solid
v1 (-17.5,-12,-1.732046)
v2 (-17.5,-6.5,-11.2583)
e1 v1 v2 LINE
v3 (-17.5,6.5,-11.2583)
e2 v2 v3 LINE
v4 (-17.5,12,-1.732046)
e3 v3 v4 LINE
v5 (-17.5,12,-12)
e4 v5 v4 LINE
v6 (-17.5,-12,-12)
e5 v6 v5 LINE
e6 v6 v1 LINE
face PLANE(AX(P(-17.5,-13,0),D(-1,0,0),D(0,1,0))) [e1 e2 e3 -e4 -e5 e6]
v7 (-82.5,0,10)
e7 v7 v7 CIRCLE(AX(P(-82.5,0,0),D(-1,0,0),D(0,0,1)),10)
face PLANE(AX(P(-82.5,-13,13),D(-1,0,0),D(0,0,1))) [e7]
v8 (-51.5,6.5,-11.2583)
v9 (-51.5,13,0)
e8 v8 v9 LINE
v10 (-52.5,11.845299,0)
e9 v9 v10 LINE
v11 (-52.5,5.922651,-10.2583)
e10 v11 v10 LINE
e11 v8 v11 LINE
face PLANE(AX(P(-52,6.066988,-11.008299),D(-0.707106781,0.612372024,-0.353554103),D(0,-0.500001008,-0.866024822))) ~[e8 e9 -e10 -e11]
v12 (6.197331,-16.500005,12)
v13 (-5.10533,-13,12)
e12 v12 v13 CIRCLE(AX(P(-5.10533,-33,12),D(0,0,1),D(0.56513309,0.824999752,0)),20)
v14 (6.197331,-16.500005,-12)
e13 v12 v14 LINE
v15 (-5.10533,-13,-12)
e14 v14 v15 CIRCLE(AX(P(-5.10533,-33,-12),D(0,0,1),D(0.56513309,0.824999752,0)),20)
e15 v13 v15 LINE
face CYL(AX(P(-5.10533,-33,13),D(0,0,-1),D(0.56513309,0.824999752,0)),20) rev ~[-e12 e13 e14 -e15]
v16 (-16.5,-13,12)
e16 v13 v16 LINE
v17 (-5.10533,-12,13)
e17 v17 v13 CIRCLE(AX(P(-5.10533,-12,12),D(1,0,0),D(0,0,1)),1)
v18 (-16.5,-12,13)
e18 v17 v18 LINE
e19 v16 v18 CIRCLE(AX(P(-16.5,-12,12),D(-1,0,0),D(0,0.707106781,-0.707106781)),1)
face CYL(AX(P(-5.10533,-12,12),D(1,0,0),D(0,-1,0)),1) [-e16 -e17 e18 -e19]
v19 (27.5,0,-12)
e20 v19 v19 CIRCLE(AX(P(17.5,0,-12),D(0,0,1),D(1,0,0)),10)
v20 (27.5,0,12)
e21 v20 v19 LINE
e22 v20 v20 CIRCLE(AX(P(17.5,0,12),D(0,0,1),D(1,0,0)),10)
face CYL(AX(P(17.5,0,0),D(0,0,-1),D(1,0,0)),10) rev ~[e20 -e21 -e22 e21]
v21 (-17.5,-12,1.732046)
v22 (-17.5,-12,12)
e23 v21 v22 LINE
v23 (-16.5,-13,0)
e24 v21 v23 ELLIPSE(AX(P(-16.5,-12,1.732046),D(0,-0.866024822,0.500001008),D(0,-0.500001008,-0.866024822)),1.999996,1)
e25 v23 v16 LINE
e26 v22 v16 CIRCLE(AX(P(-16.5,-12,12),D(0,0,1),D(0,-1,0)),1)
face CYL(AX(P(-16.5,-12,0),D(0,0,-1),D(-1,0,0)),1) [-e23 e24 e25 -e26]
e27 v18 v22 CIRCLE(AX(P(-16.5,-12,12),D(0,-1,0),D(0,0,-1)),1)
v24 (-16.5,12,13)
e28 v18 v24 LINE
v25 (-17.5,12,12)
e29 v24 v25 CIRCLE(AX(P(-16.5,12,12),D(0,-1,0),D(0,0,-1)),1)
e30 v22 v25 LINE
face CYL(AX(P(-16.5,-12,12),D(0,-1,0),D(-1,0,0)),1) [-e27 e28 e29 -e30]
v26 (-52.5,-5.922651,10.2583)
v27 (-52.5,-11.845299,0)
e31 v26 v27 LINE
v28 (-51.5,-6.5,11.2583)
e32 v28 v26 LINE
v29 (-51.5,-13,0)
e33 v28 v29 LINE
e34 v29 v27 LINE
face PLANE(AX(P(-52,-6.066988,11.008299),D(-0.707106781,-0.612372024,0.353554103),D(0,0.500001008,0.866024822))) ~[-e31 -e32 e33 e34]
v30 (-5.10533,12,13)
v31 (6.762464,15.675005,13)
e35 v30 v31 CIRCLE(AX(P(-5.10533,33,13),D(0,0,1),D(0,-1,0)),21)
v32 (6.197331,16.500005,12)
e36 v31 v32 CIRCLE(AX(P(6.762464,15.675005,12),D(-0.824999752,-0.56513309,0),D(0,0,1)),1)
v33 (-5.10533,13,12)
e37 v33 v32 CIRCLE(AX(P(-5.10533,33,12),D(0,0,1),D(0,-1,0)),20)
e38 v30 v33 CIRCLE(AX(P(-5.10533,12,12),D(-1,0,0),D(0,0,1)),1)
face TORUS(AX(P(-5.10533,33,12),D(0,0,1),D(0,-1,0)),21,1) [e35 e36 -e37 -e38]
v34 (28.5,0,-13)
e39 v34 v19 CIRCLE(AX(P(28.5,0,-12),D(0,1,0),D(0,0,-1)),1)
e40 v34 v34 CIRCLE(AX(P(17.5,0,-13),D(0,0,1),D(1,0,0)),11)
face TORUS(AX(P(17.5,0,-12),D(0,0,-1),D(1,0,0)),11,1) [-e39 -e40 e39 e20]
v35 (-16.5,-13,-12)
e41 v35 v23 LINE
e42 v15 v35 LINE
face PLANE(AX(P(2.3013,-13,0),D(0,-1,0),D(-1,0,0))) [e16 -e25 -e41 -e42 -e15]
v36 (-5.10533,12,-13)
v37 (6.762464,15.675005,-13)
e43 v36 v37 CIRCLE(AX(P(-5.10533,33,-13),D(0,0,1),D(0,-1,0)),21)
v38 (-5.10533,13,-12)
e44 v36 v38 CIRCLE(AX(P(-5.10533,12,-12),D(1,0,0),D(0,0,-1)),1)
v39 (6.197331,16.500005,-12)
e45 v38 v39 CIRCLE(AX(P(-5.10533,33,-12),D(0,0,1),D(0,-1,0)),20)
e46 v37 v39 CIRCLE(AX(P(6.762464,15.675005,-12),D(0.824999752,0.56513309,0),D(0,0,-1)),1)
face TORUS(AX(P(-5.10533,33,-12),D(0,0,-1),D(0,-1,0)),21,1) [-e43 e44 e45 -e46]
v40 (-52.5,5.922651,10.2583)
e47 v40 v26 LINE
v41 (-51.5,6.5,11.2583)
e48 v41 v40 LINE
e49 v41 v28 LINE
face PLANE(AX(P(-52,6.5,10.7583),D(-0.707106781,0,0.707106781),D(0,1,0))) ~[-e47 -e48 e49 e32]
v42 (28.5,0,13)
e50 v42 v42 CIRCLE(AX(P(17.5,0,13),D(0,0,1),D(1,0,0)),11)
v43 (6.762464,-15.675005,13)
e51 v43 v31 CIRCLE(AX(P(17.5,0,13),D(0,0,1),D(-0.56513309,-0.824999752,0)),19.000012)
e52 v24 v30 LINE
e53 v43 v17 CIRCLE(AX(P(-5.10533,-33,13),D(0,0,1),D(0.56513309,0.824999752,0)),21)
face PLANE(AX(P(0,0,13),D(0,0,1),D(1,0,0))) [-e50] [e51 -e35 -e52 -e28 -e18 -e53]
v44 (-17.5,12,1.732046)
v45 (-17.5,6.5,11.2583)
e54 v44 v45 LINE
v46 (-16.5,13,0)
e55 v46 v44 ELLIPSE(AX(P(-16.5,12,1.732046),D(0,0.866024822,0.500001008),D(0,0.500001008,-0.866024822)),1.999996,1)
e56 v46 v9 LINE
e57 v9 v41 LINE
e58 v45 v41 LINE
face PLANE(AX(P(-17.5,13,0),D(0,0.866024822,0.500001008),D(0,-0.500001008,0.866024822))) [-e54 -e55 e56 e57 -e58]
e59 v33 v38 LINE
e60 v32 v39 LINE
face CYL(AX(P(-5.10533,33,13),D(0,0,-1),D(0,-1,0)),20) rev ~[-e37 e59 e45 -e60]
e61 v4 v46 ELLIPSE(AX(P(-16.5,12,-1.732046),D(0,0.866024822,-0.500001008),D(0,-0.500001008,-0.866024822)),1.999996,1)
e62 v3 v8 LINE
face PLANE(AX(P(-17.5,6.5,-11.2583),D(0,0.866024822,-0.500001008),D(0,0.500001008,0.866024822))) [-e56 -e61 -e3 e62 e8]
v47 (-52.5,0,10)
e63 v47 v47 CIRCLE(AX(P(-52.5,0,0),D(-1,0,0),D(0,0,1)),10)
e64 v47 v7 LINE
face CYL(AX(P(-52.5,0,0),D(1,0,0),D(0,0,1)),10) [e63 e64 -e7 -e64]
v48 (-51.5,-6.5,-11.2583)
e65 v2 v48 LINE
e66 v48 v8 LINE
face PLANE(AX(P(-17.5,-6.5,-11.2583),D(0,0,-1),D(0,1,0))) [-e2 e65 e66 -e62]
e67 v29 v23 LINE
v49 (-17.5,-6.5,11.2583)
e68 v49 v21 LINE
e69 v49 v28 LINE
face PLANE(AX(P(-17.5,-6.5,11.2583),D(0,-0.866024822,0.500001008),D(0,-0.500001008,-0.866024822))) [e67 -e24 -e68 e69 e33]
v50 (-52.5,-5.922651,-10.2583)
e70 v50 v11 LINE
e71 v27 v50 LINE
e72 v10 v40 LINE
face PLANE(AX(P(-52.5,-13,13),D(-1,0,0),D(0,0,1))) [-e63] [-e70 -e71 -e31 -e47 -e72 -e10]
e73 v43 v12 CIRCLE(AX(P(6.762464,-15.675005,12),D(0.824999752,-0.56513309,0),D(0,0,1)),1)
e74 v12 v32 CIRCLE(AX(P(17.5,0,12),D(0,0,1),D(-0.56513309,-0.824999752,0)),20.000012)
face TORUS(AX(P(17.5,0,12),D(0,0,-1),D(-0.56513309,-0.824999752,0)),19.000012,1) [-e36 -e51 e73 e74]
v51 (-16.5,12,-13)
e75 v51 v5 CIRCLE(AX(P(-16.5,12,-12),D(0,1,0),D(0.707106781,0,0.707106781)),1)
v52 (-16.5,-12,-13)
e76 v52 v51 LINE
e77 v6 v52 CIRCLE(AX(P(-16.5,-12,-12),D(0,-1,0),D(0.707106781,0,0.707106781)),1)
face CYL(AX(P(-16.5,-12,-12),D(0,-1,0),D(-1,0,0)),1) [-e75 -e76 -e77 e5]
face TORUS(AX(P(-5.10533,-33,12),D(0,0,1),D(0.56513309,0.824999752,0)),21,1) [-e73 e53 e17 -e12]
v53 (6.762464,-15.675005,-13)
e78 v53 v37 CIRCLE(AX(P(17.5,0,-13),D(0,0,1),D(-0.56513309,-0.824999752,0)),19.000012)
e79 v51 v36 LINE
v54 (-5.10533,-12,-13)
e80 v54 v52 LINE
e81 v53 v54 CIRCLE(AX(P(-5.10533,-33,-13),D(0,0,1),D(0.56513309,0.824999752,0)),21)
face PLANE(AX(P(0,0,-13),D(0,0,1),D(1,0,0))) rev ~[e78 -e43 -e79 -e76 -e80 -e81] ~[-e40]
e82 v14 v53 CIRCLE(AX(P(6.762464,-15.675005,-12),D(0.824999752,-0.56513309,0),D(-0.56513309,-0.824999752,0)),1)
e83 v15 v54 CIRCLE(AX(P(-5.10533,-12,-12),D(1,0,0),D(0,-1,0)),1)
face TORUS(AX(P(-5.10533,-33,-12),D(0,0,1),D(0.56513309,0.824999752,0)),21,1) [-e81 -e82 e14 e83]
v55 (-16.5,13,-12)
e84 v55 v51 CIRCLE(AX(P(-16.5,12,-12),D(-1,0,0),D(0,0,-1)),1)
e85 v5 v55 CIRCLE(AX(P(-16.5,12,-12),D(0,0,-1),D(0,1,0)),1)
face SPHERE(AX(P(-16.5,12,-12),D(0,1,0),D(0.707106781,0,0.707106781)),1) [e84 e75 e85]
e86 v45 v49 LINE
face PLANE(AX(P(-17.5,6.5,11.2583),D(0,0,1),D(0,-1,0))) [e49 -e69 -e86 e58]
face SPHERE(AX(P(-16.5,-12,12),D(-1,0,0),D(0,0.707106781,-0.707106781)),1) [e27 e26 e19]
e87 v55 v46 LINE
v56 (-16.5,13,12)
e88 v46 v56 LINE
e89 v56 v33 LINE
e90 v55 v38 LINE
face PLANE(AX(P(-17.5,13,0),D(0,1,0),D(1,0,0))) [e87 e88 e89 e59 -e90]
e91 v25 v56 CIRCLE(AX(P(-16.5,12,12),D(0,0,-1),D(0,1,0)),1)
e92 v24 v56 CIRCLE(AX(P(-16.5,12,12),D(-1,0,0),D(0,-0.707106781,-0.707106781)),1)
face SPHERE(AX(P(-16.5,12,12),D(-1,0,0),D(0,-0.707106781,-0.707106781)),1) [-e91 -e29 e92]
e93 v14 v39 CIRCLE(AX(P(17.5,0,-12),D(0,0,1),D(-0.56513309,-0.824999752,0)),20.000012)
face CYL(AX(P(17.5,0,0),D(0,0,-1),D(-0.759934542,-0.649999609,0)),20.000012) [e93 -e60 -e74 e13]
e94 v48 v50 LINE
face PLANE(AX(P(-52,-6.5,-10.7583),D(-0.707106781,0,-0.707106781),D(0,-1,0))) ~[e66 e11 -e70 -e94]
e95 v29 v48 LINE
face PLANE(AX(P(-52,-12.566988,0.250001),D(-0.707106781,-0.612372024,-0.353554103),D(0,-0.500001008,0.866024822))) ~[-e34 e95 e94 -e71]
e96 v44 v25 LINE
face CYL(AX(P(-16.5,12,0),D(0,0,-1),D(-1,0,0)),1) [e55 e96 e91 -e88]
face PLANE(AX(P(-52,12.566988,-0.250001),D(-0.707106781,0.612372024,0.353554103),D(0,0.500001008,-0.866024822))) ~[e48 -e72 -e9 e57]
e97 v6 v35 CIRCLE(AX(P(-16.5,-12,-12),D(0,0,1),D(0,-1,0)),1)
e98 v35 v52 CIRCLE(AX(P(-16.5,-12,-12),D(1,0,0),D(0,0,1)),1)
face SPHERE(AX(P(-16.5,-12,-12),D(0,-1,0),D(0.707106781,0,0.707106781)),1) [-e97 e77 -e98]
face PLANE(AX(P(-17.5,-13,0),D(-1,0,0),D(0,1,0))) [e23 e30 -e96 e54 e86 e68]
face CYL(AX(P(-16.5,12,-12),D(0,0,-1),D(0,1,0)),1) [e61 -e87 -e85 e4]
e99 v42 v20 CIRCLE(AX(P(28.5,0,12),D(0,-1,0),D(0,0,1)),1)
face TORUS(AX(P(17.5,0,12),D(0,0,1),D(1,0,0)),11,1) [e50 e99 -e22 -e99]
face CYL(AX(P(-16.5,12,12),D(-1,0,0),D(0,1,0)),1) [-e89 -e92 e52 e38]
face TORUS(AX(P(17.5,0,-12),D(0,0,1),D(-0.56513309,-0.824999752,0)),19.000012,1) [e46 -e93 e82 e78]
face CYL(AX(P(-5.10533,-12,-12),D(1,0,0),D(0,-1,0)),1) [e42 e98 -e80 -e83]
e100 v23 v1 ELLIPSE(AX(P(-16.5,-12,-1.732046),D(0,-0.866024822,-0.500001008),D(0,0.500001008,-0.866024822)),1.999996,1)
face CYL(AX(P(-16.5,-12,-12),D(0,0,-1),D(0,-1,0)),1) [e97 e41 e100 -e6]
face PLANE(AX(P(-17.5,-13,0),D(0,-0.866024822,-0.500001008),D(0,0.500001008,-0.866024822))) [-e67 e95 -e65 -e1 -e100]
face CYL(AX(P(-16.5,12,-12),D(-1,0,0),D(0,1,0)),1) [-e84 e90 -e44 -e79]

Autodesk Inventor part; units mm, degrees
ref_plane "YZ Plane" through (0, 0, 0) normal (1, 0, 0) x (0, 1, 0)
ref_plane "XZ Plane" through (0, 0, 0) normal (0, 1, 0) x (-1, 0, 0)
ref_plane "XY Plane" through (0, 0, 0) normal (0, 0, 1) x (1, 0, 0)
sketch "Sketch1" plane through (0, 0, 0) normal (0, 0, 1) x (1, 0, 0)
  line L0 (-17.5, 13) -> (2.3013, 13)
  line L1 (2.3013, -13) -> (-17.5, -13)
  line L2 (-17.5, -13) -> (-17.5, 13)
  arc A0 (2.3013, -13) -> (2.3013, 13) centre (17.5, 0) ccw
  circle A1 centre (17.5, 0) radius 10
  point P0 (0, 0)
extrude "Extrusion1" add sketch "Sketch1" along normal mid plane 26
sketch "Sketch2" plane through (-17.5, -13, 13) normal (-1, 0, 0) x (0, 0, 1)
  line L0 (-26, 26) -> (0, 26) projected
  line L1 (-13, 26) -> (-1.7417, 19.5)
  line L2 (-1.7417, 19.5) -> (-1.7417, 6.5)
  line L3 (-1.7417, 6.5) -> (-13, 0)
  line L4 (-13, 0) -> (-24.2583, 6.5)
  line L5 (-24.2583, 6.5) -> (-24.2583, 19.5)
  line L6 (-24.2583, 19.5) -> (-13, 26)
  point P0 (-13, 13)
  point P1 (-13, 13)
extrude "Extrusion2" add sketch "Sketch2" along normal blind 35
sketch "Sketch3" plane through (-52.5, -13, 13) normal (-1, 0, 0) x (0, 0, 1)
  circle A0 centre (-13, 13) radius 10
extrude "Extrusion3" add sketch "Sketch3" along normal blind 30
fillet "Fillet1" radius 20 1 edges at (2.3013, 13, 0)
fillet "Fillet2" radius 20 1 edges at (2.3013, -13, 0)
chamfer "Chamfer1" distance 1 angle 45 6 edges at (-52.5, -9.75, -5.6292) (-52.5, 0, -11.2583) (-52.5, 9.75, -5.6292) (-52.5, -9.75, 5.6292) (-52.5, 0, 11.2583) (-52.5, 9.75, 5.6292)
fillet "Fillet3" radius 1 18 edges at (7.5, 0, -13) (7.5, 0, 13) (0.8108, -13.895, -13) (-11.3027, -13, -13) (0.8108, 13.895, -13) (-11.3027, 13, -13) (37.5, 0, -13) (-17.5, 0, -13) (0.8108, -13.895, 13) (37.5, 0, 13) (0.8108, 13.895, 13) (-11.3027, 13, 13) (-11.3027, -13, 13) (-17.5, 0, 13) (-17.5, -13, 6.5) (-17.5, -13, -6.5) (-17.5, 13, 6.5) (-17.5, 13, -6.5)
properties part number "Single Eye End"
